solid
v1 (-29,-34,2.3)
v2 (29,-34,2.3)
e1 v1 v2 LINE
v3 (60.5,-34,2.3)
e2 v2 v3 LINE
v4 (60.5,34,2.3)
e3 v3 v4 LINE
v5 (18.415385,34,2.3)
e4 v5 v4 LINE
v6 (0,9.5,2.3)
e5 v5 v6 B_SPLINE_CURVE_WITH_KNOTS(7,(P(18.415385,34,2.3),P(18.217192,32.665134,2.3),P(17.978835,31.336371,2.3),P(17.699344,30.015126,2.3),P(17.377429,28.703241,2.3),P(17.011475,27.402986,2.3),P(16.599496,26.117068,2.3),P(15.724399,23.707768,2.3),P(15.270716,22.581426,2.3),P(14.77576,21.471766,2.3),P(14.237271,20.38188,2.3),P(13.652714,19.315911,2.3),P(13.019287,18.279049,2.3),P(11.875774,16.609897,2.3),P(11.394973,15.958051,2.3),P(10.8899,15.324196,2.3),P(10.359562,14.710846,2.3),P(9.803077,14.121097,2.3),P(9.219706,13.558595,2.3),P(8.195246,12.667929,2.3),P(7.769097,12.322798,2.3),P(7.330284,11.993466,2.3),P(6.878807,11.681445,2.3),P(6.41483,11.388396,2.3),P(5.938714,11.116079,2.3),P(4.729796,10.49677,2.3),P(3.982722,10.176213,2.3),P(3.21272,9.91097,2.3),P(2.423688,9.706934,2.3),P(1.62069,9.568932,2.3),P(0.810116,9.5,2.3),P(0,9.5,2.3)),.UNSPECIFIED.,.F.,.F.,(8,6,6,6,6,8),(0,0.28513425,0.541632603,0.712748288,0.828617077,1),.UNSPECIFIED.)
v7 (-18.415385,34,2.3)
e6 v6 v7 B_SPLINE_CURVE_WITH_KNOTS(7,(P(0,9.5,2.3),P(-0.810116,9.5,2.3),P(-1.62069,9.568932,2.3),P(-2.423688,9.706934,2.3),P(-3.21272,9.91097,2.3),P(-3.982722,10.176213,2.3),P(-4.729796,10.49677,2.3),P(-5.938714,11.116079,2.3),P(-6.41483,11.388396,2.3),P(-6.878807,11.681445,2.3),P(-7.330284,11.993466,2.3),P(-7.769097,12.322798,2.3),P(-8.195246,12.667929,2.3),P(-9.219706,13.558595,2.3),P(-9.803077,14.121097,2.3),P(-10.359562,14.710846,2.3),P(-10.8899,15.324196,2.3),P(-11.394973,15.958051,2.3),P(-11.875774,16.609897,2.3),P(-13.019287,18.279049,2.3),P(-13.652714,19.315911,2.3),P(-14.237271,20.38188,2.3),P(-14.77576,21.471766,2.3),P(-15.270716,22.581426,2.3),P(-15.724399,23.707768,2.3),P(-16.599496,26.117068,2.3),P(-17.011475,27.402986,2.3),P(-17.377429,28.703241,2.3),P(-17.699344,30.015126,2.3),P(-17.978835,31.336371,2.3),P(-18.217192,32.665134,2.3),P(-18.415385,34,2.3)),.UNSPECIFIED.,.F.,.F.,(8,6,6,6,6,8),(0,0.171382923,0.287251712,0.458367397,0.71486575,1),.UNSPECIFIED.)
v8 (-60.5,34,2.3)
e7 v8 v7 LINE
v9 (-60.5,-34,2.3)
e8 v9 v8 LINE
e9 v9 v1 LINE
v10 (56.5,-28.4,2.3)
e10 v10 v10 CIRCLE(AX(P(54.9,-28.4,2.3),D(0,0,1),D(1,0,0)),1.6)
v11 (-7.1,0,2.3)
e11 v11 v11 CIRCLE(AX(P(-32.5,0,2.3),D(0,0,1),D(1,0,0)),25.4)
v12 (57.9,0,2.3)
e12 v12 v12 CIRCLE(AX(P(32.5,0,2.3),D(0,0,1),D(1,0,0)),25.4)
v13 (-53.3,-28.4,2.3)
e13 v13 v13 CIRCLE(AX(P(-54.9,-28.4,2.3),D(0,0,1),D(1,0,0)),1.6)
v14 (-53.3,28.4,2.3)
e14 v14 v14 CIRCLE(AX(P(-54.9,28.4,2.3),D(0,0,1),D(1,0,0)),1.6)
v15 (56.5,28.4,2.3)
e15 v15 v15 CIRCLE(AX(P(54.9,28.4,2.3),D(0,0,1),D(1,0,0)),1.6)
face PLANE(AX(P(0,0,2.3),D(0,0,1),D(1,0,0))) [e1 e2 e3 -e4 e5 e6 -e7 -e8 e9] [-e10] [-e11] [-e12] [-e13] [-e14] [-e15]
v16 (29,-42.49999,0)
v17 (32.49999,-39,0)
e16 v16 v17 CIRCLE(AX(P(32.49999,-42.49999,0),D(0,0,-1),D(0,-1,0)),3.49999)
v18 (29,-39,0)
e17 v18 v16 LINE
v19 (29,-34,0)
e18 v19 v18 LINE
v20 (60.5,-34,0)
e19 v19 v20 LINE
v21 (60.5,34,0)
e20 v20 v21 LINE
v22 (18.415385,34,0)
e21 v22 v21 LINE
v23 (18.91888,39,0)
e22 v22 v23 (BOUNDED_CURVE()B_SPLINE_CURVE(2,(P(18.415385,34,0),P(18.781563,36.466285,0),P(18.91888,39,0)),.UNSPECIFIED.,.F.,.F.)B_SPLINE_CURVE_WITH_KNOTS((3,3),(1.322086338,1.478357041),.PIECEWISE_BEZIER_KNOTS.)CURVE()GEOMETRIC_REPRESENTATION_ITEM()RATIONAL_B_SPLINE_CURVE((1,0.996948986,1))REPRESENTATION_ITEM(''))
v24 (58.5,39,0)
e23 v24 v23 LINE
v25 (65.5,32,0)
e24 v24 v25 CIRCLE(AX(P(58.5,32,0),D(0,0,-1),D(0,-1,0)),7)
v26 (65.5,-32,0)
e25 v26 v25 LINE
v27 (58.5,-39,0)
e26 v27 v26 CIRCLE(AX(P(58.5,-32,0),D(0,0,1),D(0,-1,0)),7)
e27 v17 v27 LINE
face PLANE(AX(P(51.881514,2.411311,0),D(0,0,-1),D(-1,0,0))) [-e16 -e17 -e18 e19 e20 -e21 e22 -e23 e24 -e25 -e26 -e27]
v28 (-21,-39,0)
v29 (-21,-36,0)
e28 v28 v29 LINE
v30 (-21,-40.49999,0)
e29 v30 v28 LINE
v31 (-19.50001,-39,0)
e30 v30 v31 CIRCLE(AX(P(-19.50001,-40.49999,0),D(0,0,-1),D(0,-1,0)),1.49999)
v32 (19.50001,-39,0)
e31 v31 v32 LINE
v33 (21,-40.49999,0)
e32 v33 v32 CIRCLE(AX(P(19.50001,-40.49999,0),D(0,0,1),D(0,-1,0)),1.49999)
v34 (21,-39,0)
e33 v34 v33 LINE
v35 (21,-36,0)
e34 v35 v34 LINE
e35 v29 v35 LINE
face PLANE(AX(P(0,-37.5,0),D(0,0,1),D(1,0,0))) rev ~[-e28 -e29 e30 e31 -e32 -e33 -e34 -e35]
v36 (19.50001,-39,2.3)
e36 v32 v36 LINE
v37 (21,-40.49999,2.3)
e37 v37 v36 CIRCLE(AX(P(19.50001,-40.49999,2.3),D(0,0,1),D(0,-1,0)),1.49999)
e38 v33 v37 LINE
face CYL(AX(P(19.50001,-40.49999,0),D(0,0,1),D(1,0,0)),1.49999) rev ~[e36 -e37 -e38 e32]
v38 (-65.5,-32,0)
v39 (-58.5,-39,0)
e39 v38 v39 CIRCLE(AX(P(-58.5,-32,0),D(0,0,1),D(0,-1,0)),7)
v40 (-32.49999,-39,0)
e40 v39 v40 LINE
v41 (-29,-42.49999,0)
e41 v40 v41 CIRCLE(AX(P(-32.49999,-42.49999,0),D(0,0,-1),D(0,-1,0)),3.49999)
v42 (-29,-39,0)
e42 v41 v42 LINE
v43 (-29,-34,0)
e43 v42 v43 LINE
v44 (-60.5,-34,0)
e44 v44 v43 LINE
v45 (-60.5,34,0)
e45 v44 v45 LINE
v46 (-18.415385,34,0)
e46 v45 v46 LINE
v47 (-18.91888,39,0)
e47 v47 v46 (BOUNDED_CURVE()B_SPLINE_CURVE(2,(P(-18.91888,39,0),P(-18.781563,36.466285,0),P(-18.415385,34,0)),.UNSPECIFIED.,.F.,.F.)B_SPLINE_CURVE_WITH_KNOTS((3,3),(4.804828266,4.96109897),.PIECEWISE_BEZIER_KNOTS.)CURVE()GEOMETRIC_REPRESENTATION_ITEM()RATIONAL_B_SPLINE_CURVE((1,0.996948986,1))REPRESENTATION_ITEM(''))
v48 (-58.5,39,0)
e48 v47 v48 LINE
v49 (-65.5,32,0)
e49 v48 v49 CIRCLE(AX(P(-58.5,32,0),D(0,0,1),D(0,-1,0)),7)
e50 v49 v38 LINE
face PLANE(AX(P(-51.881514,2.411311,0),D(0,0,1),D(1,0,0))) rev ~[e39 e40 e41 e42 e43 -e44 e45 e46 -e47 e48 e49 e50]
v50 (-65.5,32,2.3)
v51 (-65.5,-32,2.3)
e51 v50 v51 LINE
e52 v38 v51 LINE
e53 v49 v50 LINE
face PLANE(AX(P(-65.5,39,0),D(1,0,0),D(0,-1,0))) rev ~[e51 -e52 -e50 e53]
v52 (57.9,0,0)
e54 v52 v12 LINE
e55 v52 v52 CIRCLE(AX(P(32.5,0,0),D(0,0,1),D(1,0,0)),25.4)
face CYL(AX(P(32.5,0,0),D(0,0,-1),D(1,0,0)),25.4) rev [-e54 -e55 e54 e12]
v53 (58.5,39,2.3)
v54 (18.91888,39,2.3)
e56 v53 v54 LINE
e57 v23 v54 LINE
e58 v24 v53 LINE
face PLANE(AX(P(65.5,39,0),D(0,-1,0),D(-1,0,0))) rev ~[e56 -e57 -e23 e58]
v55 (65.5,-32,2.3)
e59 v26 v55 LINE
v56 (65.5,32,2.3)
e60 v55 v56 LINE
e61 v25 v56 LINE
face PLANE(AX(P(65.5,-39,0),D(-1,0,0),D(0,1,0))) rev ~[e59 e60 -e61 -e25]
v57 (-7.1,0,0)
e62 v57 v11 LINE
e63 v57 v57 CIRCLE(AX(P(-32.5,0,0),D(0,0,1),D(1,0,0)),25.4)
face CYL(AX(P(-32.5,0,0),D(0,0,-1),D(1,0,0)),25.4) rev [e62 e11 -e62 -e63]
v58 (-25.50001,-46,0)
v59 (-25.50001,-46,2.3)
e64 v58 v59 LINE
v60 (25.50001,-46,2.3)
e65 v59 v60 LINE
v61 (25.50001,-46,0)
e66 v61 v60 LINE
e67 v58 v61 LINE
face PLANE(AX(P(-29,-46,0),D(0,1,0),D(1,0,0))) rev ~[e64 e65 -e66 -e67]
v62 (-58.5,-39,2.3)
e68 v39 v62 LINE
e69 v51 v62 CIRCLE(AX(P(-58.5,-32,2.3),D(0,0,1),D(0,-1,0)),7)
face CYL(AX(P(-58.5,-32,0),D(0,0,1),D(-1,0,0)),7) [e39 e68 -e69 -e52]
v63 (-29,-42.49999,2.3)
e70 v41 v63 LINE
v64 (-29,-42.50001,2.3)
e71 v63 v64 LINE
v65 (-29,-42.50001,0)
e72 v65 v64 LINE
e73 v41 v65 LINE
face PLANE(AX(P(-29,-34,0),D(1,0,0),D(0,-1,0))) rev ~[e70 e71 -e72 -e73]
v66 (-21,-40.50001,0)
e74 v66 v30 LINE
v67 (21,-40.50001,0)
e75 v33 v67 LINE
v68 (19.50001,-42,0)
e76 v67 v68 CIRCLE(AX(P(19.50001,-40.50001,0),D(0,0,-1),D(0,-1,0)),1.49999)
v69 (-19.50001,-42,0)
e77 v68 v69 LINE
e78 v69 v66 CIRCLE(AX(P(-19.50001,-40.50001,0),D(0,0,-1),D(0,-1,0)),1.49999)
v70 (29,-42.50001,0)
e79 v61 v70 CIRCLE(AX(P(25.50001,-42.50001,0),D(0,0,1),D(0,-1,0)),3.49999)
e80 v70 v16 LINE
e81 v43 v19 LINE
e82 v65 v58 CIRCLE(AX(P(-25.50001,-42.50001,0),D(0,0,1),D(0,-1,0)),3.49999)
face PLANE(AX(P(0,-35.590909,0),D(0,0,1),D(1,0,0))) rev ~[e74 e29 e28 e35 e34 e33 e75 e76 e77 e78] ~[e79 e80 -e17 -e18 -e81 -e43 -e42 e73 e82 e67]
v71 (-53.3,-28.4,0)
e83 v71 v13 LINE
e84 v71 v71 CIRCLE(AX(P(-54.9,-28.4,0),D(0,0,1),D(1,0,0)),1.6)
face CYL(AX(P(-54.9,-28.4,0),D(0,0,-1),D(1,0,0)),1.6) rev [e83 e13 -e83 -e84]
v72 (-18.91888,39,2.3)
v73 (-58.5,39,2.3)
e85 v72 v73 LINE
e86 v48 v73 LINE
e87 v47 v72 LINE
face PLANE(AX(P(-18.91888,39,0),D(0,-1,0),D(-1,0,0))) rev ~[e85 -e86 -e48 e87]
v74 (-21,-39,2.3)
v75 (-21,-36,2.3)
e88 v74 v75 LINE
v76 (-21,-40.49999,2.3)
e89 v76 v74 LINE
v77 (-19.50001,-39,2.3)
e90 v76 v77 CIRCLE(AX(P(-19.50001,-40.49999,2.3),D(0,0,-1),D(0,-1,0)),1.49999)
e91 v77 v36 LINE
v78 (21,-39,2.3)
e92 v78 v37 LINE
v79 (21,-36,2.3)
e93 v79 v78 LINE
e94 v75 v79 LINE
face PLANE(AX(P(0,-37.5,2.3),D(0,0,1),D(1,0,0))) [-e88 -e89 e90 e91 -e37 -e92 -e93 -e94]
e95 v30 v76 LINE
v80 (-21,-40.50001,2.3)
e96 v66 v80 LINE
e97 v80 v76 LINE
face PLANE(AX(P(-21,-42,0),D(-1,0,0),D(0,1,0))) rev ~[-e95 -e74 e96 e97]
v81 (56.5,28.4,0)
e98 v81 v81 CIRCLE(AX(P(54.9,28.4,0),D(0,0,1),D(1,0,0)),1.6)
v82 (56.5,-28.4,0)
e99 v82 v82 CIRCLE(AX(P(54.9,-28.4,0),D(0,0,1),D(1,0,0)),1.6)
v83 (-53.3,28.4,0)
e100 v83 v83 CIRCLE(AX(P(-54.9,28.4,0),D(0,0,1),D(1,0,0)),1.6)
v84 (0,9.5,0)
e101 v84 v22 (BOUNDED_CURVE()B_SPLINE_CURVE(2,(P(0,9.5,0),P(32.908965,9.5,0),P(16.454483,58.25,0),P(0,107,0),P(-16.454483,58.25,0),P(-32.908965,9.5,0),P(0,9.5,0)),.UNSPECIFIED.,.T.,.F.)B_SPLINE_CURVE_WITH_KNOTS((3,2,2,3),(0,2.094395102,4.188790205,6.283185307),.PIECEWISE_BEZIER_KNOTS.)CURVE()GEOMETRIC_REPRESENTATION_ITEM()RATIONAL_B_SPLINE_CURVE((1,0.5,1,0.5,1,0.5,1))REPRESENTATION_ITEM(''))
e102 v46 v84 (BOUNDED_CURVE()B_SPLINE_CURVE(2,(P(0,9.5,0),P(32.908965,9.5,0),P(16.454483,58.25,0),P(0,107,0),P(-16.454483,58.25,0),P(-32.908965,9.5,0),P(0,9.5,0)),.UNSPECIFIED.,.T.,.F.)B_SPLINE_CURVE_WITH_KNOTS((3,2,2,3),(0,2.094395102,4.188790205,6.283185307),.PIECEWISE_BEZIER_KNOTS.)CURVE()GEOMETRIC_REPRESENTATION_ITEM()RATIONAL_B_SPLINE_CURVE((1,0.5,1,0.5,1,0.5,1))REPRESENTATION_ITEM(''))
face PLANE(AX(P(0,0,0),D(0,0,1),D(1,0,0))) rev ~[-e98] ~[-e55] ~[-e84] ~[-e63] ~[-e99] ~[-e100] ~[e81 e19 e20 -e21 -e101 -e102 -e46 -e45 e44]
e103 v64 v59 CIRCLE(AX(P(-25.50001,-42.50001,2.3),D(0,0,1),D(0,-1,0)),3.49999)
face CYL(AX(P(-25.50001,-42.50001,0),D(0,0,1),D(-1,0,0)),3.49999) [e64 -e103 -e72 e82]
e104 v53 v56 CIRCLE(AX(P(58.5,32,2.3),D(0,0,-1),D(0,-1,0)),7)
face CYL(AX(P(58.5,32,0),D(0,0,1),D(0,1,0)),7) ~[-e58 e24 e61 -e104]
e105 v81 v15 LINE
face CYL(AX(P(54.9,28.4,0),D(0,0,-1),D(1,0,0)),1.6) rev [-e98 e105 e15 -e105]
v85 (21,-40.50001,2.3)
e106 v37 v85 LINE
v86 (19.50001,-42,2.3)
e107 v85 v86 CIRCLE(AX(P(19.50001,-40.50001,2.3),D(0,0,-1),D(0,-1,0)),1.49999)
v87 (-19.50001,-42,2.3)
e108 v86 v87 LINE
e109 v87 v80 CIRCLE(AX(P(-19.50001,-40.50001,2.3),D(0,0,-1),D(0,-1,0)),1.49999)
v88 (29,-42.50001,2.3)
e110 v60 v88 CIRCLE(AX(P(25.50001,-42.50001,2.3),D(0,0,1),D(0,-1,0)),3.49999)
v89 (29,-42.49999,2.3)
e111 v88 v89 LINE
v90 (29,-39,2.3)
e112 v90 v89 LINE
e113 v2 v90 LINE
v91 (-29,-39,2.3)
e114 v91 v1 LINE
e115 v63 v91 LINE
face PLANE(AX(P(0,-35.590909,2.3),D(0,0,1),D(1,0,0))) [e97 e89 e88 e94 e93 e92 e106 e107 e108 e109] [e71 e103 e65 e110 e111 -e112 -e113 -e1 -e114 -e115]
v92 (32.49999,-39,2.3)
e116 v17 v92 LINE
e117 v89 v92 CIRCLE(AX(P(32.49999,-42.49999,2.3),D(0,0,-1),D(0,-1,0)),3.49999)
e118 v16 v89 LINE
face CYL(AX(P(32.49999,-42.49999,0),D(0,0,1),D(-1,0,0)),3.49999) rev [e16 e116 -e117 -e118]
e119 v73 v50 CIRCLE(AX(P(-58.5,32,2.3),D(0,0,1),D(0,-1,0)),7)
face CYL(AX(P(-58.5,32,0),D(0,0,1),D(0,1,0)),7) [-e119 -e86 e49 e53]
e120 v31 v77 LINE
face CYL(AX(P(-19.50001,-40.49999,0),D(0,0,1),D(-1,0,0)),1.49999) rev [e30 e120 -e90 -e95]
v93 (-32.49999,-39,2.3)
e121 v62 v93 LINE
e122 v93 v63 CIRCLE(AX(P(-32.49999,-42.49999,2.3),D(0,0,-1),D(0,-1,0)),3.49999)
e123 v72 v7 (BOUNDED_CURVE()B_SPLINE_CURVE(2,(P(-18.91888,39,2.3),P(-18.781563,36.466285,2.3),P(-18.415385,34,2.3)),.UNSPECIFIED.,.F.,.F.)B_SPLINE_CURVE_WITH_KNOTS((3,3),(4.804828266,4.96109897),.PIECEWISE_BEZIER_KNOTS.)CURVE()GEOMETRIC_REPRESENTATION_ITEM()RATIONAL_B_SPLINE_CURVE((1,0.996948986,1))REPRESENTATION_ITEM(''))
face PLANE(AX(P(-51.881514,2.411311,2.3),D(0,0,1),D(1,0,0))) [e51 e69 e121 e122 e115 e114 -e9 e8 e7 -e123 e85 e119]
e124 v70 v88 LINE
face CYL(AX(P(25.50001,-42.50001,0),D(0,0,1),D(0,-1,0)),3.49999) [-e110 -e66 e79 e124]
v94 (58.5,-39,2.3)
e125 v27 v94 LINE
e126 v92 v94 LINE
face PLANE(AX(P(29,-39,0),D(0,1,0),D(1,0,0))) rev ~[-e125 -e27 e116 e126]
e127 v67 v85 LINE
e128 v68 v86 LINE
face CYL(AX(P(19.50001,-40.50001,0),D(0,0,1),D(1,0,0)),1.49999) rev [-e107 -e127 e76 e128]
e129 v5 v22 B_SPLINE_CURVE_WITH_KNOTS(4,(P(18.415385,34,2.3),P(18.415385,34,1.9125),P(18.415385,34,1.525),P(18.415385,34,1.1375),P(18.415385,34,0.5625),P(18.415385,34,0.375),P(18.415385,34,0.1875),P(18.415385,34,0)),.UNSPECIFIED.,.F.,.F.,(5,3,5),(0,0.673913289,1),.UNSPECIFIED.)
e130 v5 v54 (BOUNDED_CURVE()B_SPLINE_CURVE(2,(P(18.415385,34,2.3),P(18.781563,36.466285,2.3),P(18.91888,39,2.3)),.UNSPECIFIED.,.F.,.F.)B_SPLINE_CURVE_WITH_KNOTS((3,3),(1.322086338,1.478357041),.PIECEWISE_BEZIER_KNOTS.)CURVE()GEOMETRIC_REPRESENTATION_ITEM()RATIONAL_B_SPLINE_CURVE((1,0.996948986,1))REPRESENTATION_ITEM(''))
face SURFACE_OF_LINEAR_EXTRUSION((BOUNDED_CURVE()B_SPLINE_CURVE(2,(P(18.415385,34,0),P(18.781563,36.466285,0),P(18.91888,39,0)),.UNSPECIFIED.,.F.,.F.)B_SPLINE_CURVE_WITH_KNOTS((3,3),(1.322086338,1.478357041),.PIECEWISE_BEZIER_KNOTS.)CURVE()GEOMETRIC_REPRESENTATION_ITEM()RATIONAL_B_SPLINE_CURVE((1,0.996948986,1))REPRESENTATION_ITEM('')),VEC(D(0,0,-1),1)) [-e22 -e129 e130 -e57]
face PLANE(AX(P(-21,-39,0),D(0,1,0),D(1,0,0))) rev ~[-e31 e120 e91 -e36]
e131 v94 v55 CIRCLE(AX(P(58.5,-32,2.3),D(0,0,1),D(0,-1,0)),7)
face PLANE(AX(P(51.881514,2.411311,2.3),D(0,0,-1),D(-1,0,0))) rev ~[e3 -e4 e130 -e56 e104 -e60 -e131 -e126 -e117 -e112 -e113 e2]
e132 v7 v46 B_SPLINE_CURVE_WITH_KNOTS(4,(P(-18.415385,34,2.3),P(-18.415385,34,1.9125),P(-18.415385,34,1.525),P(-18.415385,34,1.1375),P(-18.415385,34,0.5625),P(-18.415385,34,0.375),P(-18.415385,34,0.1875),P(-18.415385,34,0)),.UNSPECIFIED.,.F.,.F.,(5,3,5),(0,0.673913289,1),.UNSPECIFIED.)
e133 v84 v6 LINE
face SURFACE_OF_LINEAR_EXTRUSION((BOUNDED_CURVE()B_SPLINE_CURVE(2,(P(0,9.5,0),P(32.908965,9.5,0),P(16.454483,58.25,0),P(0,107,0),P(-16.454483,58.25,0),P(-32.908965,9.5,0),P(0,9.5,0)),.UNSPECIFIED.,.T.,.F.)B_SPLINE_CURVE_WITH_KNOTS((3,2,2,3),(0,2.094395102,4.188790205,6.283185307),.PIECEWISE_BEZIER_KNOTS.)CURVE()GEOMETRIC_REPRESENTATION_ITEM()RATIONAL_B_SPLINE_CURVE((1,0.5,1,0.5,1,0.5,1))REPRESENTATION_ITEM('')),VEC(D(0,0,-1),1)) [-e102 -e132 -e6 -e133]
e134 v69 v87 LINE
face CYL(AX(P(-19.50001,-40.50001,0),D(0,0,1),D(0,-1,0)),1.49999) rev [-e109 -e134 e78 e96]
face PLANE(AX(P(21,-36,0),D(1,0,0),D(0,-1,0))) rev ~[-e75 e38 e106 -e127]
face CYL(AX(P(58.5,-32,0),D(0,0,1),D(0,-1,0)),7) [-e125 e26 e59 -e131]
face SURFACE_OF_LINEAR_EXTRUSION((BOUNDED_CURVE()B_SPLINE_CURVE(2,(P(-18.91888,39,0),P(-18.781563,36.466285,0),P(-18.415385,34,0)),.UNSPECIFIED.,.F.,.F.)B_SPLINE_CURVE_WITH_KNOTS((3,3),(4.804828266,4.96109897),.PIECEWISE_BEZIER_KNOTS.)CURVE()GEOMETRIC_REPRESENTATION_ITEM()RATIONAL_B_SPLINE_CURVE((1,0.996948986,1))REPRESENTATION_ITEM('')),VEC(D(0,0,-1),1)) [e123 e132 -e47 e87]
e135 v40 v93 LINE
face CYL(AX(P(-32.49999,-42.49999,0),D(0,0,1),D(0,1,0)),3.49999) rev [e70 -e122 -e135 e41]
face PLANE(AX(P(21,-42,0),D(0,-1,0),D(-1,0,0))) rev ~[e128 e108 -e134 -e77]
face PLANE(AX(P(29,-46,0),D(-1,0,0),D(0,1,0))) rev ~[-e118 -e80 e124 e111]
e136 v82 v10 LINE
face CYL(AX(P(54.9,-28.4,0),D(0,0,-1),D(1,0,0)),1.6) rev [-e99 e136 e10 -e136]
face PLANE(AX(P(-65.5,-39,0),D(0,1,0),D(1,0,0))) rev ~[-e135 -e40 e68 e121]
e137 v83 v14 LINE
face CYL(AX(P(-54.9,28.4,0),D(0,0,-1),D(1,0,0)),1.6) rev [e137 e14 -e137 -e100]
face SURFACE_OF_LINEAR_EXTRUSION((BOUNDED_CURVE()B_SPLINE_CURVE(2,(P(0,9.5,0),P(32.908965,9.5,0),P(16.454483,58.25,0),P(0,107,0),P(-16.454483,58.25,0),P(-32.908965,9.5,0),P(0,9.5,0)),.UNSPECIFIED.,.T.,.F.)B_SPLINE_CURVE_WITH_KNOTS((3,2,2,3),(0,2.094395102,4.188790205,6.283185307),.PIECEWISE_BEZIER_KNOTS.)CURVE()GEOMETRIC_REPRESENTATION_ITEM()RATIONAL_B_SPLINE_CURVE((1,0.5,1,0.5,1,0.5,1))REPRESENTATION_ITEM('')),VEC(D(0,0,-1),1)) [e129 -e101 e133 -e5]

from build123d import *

# Parameters (mm, degrees)
F3_DEPTH = 2.3
F0_W     = 121
F0_H     = 68
F0_R     = 1.6
F0_R_2   = 25.4
F4_DEPTH = 25
F6_DEPTH = 2.3
F1_W     = 42
F1_H     = 3
F7_DEPTH = 2.3
F8_R     = 7
F9_R     = 3.49999
F10_R    = 1.49999


# Not quite as in the source:
# - a fillet or chamfer is up to 0.001 mm smaller than in the source, because OpenCascade refuses the exact size


with BuildPart() as f3:
    # F2 (on face) → F3 (new body)
    with BuildSketch(Plane.XY):
        with BuildLine():
            add(Edge.make_bspline(
                [(18.4153846154, 34), (18.7815631387, 36.4662846266), (18.9188800849, 39)],
                knots=[1.3220863377, 1.3220863377, 1.3220863377, 1.4783570414, 1.4783570414, 1.4783570414], degree=2, weights=[1, 0.9969489861, 1]))
            Line((18.4153846154, 34), (60.5, 34))
            Line((60.5, 34), (60.5, -34))
            Line((60.5, -34), (29, -34))
            Line((29, -34), (29, -39))
            Line((29, -39), (65.5, -39))
            Line((65.5, -39), (65.5, 39))
            Line((65.5, 39), (18.9188800849, 39))
        make_face()
    extrude(amount=F3_DEPTH)


with BuildPart() as f3b:
    # F2 (on face) → F3, piece 2 (new body)
    with BuildSketch(Plane.XY):
        with BuildLine():
            Line((-60.5, 34), (-18.4153846154, 34))
            add(Edge.make_bspline(
                [(-18.9188800849, 39), (-18.7815631387, 36.4662846266), (-18.4153846154, 34)],
                knots=[4.8048282657, 4.8048282657, 4.8048282657, 4.9610989695, 4.9610989695, 4.9610989695], degree=2, weights=[1, 0.9969489861, 1]))
            Line((-18.9188800849, 39), (-65.5, 39))
            Line((-65.5, 39), (-65.5, -39))
            Line((-65.5, -39), (-29, -39))
            Line((-29, -39), (-29, -34))
            Line((-29, -34), (-60.5, -34))
            Line((-60.5, -34), (-60.5, 34))
        make_face()
    extrude(amount=F3_DEPTH)


with BuildPart() as f3c:
    # F0 (on Top) → F3, piece 3 (new body)
    with BuildSketch(Plane.XY):
        Rectangle(F0_W, F0_H)
        with Locations((-54.9, -28.4)):
            Circle(F0_R, mode=Mode.SUBTRACT)
        with Locations((54.9, -28.4)):
            Circle(F0_R, mode=Mode.SUBTRACT)
        with Locations((-32.5, 0)):
            Circle(F0_R_2, mode=Mode.SUBTRACT)
        with Locations((-54.9, 28.4)):
            Circle(F0_R, mode=Mode.SUBTRACT)
        with Locations((32.5, 0)):
            Circle(F0_R_2, mode=Mode.SUBTRACT)
        with Locations((54.9, 28.4)):
            Circle(F0_R, mode=Mode.SUBTRACT)
    extrude(amount=F3_DEPTH)

    # F2 (on face) → F4 (cut)
    with BuildSketch(Plane.XY):
        with BuildLine():
            add(Edge.make_bspline(
                [(0, 9.5), (32.9089653438, 9.5), (16.4544826719, 58.25), (0, 107), (-16.4544826719, 58.25), (-32.9089653438, 9.5), (0, 9.5)],
                knots=[0, 0, 0, 2.0943951024, 2.0943951024, 4.1887902048, 4.1887902048, 6.2831853072, 6.2831853072, 6.2831853072], degree=2, weights=[1, 0.5, 1, 0.5, 1, 0.5, 1]))
        make_face()
    extrude(amount=F4_DEPTH, mode=Mode.SUBTRACT)

    # F5: union F3, F3b
    add(f3.part)
    add(f3b.part)

    # F1 (on Top) → F6 (join, through all)
    with BuildSketch(Plane.XY):
        Polygon((29, -39), (29, -34), (-29, -34), (-29, -39), (-21, -39), (-21, -36), (21, -36), (21, -39), align=None)
        Polygon((29, -46), (29, -39), (21, -39), (21, -42), (-21, -42), (-21, -39), (-29, -39), (-29, -46), align=None)
    extrude(amount=F6_DEPTH)

    # F1 (on Top) → F7 (join, through all)
    with BuildSketch(Plane.XY):
        with Locations((0, -37.5)):
            Rectangle(F1_W, F1_H)
    extrude(amount=F7_DEPTH)

    # F8
    f8_edges = [f3c.edges().sort_by_distance(p)[0] for p in [
        (65.5, -39, 1.15),
        (65.5, 39, 1.15),
        (-65.5, 39, 1.15),
        (-65.5, -39, 1.15),
    ]]
    fillet(f8_edges, radius=F8_R)

    # F9 (radius 3.5 in the source; OpenCascade refuses exactly that, so slightly less here)
    f9_edges = [f3c.edges().sort_by_distance(p)[0] for p in [
        (29, -39, 1.15),
        (29, -46, 1.15),
        (-29, -39, 1.15),
        (-29, -46, 1.15),
    ]]
    fillet(f9_edges, radius=F9_R)

    # F10 (radius 1.5 in the source; OpenCascade refuses exactly that, so slightly less here)
    f10_edges = [f3c.edges().sort_by_distance(p)[0] for p in [
        (-21, -42, 1.15),
        (-21, -39, 1.15),
        (21, -42, 1.15),
        (21, -39, 1.15),
    ]]
    fillet(f10_edges, radius=F10_R)


solid = f3c.part
